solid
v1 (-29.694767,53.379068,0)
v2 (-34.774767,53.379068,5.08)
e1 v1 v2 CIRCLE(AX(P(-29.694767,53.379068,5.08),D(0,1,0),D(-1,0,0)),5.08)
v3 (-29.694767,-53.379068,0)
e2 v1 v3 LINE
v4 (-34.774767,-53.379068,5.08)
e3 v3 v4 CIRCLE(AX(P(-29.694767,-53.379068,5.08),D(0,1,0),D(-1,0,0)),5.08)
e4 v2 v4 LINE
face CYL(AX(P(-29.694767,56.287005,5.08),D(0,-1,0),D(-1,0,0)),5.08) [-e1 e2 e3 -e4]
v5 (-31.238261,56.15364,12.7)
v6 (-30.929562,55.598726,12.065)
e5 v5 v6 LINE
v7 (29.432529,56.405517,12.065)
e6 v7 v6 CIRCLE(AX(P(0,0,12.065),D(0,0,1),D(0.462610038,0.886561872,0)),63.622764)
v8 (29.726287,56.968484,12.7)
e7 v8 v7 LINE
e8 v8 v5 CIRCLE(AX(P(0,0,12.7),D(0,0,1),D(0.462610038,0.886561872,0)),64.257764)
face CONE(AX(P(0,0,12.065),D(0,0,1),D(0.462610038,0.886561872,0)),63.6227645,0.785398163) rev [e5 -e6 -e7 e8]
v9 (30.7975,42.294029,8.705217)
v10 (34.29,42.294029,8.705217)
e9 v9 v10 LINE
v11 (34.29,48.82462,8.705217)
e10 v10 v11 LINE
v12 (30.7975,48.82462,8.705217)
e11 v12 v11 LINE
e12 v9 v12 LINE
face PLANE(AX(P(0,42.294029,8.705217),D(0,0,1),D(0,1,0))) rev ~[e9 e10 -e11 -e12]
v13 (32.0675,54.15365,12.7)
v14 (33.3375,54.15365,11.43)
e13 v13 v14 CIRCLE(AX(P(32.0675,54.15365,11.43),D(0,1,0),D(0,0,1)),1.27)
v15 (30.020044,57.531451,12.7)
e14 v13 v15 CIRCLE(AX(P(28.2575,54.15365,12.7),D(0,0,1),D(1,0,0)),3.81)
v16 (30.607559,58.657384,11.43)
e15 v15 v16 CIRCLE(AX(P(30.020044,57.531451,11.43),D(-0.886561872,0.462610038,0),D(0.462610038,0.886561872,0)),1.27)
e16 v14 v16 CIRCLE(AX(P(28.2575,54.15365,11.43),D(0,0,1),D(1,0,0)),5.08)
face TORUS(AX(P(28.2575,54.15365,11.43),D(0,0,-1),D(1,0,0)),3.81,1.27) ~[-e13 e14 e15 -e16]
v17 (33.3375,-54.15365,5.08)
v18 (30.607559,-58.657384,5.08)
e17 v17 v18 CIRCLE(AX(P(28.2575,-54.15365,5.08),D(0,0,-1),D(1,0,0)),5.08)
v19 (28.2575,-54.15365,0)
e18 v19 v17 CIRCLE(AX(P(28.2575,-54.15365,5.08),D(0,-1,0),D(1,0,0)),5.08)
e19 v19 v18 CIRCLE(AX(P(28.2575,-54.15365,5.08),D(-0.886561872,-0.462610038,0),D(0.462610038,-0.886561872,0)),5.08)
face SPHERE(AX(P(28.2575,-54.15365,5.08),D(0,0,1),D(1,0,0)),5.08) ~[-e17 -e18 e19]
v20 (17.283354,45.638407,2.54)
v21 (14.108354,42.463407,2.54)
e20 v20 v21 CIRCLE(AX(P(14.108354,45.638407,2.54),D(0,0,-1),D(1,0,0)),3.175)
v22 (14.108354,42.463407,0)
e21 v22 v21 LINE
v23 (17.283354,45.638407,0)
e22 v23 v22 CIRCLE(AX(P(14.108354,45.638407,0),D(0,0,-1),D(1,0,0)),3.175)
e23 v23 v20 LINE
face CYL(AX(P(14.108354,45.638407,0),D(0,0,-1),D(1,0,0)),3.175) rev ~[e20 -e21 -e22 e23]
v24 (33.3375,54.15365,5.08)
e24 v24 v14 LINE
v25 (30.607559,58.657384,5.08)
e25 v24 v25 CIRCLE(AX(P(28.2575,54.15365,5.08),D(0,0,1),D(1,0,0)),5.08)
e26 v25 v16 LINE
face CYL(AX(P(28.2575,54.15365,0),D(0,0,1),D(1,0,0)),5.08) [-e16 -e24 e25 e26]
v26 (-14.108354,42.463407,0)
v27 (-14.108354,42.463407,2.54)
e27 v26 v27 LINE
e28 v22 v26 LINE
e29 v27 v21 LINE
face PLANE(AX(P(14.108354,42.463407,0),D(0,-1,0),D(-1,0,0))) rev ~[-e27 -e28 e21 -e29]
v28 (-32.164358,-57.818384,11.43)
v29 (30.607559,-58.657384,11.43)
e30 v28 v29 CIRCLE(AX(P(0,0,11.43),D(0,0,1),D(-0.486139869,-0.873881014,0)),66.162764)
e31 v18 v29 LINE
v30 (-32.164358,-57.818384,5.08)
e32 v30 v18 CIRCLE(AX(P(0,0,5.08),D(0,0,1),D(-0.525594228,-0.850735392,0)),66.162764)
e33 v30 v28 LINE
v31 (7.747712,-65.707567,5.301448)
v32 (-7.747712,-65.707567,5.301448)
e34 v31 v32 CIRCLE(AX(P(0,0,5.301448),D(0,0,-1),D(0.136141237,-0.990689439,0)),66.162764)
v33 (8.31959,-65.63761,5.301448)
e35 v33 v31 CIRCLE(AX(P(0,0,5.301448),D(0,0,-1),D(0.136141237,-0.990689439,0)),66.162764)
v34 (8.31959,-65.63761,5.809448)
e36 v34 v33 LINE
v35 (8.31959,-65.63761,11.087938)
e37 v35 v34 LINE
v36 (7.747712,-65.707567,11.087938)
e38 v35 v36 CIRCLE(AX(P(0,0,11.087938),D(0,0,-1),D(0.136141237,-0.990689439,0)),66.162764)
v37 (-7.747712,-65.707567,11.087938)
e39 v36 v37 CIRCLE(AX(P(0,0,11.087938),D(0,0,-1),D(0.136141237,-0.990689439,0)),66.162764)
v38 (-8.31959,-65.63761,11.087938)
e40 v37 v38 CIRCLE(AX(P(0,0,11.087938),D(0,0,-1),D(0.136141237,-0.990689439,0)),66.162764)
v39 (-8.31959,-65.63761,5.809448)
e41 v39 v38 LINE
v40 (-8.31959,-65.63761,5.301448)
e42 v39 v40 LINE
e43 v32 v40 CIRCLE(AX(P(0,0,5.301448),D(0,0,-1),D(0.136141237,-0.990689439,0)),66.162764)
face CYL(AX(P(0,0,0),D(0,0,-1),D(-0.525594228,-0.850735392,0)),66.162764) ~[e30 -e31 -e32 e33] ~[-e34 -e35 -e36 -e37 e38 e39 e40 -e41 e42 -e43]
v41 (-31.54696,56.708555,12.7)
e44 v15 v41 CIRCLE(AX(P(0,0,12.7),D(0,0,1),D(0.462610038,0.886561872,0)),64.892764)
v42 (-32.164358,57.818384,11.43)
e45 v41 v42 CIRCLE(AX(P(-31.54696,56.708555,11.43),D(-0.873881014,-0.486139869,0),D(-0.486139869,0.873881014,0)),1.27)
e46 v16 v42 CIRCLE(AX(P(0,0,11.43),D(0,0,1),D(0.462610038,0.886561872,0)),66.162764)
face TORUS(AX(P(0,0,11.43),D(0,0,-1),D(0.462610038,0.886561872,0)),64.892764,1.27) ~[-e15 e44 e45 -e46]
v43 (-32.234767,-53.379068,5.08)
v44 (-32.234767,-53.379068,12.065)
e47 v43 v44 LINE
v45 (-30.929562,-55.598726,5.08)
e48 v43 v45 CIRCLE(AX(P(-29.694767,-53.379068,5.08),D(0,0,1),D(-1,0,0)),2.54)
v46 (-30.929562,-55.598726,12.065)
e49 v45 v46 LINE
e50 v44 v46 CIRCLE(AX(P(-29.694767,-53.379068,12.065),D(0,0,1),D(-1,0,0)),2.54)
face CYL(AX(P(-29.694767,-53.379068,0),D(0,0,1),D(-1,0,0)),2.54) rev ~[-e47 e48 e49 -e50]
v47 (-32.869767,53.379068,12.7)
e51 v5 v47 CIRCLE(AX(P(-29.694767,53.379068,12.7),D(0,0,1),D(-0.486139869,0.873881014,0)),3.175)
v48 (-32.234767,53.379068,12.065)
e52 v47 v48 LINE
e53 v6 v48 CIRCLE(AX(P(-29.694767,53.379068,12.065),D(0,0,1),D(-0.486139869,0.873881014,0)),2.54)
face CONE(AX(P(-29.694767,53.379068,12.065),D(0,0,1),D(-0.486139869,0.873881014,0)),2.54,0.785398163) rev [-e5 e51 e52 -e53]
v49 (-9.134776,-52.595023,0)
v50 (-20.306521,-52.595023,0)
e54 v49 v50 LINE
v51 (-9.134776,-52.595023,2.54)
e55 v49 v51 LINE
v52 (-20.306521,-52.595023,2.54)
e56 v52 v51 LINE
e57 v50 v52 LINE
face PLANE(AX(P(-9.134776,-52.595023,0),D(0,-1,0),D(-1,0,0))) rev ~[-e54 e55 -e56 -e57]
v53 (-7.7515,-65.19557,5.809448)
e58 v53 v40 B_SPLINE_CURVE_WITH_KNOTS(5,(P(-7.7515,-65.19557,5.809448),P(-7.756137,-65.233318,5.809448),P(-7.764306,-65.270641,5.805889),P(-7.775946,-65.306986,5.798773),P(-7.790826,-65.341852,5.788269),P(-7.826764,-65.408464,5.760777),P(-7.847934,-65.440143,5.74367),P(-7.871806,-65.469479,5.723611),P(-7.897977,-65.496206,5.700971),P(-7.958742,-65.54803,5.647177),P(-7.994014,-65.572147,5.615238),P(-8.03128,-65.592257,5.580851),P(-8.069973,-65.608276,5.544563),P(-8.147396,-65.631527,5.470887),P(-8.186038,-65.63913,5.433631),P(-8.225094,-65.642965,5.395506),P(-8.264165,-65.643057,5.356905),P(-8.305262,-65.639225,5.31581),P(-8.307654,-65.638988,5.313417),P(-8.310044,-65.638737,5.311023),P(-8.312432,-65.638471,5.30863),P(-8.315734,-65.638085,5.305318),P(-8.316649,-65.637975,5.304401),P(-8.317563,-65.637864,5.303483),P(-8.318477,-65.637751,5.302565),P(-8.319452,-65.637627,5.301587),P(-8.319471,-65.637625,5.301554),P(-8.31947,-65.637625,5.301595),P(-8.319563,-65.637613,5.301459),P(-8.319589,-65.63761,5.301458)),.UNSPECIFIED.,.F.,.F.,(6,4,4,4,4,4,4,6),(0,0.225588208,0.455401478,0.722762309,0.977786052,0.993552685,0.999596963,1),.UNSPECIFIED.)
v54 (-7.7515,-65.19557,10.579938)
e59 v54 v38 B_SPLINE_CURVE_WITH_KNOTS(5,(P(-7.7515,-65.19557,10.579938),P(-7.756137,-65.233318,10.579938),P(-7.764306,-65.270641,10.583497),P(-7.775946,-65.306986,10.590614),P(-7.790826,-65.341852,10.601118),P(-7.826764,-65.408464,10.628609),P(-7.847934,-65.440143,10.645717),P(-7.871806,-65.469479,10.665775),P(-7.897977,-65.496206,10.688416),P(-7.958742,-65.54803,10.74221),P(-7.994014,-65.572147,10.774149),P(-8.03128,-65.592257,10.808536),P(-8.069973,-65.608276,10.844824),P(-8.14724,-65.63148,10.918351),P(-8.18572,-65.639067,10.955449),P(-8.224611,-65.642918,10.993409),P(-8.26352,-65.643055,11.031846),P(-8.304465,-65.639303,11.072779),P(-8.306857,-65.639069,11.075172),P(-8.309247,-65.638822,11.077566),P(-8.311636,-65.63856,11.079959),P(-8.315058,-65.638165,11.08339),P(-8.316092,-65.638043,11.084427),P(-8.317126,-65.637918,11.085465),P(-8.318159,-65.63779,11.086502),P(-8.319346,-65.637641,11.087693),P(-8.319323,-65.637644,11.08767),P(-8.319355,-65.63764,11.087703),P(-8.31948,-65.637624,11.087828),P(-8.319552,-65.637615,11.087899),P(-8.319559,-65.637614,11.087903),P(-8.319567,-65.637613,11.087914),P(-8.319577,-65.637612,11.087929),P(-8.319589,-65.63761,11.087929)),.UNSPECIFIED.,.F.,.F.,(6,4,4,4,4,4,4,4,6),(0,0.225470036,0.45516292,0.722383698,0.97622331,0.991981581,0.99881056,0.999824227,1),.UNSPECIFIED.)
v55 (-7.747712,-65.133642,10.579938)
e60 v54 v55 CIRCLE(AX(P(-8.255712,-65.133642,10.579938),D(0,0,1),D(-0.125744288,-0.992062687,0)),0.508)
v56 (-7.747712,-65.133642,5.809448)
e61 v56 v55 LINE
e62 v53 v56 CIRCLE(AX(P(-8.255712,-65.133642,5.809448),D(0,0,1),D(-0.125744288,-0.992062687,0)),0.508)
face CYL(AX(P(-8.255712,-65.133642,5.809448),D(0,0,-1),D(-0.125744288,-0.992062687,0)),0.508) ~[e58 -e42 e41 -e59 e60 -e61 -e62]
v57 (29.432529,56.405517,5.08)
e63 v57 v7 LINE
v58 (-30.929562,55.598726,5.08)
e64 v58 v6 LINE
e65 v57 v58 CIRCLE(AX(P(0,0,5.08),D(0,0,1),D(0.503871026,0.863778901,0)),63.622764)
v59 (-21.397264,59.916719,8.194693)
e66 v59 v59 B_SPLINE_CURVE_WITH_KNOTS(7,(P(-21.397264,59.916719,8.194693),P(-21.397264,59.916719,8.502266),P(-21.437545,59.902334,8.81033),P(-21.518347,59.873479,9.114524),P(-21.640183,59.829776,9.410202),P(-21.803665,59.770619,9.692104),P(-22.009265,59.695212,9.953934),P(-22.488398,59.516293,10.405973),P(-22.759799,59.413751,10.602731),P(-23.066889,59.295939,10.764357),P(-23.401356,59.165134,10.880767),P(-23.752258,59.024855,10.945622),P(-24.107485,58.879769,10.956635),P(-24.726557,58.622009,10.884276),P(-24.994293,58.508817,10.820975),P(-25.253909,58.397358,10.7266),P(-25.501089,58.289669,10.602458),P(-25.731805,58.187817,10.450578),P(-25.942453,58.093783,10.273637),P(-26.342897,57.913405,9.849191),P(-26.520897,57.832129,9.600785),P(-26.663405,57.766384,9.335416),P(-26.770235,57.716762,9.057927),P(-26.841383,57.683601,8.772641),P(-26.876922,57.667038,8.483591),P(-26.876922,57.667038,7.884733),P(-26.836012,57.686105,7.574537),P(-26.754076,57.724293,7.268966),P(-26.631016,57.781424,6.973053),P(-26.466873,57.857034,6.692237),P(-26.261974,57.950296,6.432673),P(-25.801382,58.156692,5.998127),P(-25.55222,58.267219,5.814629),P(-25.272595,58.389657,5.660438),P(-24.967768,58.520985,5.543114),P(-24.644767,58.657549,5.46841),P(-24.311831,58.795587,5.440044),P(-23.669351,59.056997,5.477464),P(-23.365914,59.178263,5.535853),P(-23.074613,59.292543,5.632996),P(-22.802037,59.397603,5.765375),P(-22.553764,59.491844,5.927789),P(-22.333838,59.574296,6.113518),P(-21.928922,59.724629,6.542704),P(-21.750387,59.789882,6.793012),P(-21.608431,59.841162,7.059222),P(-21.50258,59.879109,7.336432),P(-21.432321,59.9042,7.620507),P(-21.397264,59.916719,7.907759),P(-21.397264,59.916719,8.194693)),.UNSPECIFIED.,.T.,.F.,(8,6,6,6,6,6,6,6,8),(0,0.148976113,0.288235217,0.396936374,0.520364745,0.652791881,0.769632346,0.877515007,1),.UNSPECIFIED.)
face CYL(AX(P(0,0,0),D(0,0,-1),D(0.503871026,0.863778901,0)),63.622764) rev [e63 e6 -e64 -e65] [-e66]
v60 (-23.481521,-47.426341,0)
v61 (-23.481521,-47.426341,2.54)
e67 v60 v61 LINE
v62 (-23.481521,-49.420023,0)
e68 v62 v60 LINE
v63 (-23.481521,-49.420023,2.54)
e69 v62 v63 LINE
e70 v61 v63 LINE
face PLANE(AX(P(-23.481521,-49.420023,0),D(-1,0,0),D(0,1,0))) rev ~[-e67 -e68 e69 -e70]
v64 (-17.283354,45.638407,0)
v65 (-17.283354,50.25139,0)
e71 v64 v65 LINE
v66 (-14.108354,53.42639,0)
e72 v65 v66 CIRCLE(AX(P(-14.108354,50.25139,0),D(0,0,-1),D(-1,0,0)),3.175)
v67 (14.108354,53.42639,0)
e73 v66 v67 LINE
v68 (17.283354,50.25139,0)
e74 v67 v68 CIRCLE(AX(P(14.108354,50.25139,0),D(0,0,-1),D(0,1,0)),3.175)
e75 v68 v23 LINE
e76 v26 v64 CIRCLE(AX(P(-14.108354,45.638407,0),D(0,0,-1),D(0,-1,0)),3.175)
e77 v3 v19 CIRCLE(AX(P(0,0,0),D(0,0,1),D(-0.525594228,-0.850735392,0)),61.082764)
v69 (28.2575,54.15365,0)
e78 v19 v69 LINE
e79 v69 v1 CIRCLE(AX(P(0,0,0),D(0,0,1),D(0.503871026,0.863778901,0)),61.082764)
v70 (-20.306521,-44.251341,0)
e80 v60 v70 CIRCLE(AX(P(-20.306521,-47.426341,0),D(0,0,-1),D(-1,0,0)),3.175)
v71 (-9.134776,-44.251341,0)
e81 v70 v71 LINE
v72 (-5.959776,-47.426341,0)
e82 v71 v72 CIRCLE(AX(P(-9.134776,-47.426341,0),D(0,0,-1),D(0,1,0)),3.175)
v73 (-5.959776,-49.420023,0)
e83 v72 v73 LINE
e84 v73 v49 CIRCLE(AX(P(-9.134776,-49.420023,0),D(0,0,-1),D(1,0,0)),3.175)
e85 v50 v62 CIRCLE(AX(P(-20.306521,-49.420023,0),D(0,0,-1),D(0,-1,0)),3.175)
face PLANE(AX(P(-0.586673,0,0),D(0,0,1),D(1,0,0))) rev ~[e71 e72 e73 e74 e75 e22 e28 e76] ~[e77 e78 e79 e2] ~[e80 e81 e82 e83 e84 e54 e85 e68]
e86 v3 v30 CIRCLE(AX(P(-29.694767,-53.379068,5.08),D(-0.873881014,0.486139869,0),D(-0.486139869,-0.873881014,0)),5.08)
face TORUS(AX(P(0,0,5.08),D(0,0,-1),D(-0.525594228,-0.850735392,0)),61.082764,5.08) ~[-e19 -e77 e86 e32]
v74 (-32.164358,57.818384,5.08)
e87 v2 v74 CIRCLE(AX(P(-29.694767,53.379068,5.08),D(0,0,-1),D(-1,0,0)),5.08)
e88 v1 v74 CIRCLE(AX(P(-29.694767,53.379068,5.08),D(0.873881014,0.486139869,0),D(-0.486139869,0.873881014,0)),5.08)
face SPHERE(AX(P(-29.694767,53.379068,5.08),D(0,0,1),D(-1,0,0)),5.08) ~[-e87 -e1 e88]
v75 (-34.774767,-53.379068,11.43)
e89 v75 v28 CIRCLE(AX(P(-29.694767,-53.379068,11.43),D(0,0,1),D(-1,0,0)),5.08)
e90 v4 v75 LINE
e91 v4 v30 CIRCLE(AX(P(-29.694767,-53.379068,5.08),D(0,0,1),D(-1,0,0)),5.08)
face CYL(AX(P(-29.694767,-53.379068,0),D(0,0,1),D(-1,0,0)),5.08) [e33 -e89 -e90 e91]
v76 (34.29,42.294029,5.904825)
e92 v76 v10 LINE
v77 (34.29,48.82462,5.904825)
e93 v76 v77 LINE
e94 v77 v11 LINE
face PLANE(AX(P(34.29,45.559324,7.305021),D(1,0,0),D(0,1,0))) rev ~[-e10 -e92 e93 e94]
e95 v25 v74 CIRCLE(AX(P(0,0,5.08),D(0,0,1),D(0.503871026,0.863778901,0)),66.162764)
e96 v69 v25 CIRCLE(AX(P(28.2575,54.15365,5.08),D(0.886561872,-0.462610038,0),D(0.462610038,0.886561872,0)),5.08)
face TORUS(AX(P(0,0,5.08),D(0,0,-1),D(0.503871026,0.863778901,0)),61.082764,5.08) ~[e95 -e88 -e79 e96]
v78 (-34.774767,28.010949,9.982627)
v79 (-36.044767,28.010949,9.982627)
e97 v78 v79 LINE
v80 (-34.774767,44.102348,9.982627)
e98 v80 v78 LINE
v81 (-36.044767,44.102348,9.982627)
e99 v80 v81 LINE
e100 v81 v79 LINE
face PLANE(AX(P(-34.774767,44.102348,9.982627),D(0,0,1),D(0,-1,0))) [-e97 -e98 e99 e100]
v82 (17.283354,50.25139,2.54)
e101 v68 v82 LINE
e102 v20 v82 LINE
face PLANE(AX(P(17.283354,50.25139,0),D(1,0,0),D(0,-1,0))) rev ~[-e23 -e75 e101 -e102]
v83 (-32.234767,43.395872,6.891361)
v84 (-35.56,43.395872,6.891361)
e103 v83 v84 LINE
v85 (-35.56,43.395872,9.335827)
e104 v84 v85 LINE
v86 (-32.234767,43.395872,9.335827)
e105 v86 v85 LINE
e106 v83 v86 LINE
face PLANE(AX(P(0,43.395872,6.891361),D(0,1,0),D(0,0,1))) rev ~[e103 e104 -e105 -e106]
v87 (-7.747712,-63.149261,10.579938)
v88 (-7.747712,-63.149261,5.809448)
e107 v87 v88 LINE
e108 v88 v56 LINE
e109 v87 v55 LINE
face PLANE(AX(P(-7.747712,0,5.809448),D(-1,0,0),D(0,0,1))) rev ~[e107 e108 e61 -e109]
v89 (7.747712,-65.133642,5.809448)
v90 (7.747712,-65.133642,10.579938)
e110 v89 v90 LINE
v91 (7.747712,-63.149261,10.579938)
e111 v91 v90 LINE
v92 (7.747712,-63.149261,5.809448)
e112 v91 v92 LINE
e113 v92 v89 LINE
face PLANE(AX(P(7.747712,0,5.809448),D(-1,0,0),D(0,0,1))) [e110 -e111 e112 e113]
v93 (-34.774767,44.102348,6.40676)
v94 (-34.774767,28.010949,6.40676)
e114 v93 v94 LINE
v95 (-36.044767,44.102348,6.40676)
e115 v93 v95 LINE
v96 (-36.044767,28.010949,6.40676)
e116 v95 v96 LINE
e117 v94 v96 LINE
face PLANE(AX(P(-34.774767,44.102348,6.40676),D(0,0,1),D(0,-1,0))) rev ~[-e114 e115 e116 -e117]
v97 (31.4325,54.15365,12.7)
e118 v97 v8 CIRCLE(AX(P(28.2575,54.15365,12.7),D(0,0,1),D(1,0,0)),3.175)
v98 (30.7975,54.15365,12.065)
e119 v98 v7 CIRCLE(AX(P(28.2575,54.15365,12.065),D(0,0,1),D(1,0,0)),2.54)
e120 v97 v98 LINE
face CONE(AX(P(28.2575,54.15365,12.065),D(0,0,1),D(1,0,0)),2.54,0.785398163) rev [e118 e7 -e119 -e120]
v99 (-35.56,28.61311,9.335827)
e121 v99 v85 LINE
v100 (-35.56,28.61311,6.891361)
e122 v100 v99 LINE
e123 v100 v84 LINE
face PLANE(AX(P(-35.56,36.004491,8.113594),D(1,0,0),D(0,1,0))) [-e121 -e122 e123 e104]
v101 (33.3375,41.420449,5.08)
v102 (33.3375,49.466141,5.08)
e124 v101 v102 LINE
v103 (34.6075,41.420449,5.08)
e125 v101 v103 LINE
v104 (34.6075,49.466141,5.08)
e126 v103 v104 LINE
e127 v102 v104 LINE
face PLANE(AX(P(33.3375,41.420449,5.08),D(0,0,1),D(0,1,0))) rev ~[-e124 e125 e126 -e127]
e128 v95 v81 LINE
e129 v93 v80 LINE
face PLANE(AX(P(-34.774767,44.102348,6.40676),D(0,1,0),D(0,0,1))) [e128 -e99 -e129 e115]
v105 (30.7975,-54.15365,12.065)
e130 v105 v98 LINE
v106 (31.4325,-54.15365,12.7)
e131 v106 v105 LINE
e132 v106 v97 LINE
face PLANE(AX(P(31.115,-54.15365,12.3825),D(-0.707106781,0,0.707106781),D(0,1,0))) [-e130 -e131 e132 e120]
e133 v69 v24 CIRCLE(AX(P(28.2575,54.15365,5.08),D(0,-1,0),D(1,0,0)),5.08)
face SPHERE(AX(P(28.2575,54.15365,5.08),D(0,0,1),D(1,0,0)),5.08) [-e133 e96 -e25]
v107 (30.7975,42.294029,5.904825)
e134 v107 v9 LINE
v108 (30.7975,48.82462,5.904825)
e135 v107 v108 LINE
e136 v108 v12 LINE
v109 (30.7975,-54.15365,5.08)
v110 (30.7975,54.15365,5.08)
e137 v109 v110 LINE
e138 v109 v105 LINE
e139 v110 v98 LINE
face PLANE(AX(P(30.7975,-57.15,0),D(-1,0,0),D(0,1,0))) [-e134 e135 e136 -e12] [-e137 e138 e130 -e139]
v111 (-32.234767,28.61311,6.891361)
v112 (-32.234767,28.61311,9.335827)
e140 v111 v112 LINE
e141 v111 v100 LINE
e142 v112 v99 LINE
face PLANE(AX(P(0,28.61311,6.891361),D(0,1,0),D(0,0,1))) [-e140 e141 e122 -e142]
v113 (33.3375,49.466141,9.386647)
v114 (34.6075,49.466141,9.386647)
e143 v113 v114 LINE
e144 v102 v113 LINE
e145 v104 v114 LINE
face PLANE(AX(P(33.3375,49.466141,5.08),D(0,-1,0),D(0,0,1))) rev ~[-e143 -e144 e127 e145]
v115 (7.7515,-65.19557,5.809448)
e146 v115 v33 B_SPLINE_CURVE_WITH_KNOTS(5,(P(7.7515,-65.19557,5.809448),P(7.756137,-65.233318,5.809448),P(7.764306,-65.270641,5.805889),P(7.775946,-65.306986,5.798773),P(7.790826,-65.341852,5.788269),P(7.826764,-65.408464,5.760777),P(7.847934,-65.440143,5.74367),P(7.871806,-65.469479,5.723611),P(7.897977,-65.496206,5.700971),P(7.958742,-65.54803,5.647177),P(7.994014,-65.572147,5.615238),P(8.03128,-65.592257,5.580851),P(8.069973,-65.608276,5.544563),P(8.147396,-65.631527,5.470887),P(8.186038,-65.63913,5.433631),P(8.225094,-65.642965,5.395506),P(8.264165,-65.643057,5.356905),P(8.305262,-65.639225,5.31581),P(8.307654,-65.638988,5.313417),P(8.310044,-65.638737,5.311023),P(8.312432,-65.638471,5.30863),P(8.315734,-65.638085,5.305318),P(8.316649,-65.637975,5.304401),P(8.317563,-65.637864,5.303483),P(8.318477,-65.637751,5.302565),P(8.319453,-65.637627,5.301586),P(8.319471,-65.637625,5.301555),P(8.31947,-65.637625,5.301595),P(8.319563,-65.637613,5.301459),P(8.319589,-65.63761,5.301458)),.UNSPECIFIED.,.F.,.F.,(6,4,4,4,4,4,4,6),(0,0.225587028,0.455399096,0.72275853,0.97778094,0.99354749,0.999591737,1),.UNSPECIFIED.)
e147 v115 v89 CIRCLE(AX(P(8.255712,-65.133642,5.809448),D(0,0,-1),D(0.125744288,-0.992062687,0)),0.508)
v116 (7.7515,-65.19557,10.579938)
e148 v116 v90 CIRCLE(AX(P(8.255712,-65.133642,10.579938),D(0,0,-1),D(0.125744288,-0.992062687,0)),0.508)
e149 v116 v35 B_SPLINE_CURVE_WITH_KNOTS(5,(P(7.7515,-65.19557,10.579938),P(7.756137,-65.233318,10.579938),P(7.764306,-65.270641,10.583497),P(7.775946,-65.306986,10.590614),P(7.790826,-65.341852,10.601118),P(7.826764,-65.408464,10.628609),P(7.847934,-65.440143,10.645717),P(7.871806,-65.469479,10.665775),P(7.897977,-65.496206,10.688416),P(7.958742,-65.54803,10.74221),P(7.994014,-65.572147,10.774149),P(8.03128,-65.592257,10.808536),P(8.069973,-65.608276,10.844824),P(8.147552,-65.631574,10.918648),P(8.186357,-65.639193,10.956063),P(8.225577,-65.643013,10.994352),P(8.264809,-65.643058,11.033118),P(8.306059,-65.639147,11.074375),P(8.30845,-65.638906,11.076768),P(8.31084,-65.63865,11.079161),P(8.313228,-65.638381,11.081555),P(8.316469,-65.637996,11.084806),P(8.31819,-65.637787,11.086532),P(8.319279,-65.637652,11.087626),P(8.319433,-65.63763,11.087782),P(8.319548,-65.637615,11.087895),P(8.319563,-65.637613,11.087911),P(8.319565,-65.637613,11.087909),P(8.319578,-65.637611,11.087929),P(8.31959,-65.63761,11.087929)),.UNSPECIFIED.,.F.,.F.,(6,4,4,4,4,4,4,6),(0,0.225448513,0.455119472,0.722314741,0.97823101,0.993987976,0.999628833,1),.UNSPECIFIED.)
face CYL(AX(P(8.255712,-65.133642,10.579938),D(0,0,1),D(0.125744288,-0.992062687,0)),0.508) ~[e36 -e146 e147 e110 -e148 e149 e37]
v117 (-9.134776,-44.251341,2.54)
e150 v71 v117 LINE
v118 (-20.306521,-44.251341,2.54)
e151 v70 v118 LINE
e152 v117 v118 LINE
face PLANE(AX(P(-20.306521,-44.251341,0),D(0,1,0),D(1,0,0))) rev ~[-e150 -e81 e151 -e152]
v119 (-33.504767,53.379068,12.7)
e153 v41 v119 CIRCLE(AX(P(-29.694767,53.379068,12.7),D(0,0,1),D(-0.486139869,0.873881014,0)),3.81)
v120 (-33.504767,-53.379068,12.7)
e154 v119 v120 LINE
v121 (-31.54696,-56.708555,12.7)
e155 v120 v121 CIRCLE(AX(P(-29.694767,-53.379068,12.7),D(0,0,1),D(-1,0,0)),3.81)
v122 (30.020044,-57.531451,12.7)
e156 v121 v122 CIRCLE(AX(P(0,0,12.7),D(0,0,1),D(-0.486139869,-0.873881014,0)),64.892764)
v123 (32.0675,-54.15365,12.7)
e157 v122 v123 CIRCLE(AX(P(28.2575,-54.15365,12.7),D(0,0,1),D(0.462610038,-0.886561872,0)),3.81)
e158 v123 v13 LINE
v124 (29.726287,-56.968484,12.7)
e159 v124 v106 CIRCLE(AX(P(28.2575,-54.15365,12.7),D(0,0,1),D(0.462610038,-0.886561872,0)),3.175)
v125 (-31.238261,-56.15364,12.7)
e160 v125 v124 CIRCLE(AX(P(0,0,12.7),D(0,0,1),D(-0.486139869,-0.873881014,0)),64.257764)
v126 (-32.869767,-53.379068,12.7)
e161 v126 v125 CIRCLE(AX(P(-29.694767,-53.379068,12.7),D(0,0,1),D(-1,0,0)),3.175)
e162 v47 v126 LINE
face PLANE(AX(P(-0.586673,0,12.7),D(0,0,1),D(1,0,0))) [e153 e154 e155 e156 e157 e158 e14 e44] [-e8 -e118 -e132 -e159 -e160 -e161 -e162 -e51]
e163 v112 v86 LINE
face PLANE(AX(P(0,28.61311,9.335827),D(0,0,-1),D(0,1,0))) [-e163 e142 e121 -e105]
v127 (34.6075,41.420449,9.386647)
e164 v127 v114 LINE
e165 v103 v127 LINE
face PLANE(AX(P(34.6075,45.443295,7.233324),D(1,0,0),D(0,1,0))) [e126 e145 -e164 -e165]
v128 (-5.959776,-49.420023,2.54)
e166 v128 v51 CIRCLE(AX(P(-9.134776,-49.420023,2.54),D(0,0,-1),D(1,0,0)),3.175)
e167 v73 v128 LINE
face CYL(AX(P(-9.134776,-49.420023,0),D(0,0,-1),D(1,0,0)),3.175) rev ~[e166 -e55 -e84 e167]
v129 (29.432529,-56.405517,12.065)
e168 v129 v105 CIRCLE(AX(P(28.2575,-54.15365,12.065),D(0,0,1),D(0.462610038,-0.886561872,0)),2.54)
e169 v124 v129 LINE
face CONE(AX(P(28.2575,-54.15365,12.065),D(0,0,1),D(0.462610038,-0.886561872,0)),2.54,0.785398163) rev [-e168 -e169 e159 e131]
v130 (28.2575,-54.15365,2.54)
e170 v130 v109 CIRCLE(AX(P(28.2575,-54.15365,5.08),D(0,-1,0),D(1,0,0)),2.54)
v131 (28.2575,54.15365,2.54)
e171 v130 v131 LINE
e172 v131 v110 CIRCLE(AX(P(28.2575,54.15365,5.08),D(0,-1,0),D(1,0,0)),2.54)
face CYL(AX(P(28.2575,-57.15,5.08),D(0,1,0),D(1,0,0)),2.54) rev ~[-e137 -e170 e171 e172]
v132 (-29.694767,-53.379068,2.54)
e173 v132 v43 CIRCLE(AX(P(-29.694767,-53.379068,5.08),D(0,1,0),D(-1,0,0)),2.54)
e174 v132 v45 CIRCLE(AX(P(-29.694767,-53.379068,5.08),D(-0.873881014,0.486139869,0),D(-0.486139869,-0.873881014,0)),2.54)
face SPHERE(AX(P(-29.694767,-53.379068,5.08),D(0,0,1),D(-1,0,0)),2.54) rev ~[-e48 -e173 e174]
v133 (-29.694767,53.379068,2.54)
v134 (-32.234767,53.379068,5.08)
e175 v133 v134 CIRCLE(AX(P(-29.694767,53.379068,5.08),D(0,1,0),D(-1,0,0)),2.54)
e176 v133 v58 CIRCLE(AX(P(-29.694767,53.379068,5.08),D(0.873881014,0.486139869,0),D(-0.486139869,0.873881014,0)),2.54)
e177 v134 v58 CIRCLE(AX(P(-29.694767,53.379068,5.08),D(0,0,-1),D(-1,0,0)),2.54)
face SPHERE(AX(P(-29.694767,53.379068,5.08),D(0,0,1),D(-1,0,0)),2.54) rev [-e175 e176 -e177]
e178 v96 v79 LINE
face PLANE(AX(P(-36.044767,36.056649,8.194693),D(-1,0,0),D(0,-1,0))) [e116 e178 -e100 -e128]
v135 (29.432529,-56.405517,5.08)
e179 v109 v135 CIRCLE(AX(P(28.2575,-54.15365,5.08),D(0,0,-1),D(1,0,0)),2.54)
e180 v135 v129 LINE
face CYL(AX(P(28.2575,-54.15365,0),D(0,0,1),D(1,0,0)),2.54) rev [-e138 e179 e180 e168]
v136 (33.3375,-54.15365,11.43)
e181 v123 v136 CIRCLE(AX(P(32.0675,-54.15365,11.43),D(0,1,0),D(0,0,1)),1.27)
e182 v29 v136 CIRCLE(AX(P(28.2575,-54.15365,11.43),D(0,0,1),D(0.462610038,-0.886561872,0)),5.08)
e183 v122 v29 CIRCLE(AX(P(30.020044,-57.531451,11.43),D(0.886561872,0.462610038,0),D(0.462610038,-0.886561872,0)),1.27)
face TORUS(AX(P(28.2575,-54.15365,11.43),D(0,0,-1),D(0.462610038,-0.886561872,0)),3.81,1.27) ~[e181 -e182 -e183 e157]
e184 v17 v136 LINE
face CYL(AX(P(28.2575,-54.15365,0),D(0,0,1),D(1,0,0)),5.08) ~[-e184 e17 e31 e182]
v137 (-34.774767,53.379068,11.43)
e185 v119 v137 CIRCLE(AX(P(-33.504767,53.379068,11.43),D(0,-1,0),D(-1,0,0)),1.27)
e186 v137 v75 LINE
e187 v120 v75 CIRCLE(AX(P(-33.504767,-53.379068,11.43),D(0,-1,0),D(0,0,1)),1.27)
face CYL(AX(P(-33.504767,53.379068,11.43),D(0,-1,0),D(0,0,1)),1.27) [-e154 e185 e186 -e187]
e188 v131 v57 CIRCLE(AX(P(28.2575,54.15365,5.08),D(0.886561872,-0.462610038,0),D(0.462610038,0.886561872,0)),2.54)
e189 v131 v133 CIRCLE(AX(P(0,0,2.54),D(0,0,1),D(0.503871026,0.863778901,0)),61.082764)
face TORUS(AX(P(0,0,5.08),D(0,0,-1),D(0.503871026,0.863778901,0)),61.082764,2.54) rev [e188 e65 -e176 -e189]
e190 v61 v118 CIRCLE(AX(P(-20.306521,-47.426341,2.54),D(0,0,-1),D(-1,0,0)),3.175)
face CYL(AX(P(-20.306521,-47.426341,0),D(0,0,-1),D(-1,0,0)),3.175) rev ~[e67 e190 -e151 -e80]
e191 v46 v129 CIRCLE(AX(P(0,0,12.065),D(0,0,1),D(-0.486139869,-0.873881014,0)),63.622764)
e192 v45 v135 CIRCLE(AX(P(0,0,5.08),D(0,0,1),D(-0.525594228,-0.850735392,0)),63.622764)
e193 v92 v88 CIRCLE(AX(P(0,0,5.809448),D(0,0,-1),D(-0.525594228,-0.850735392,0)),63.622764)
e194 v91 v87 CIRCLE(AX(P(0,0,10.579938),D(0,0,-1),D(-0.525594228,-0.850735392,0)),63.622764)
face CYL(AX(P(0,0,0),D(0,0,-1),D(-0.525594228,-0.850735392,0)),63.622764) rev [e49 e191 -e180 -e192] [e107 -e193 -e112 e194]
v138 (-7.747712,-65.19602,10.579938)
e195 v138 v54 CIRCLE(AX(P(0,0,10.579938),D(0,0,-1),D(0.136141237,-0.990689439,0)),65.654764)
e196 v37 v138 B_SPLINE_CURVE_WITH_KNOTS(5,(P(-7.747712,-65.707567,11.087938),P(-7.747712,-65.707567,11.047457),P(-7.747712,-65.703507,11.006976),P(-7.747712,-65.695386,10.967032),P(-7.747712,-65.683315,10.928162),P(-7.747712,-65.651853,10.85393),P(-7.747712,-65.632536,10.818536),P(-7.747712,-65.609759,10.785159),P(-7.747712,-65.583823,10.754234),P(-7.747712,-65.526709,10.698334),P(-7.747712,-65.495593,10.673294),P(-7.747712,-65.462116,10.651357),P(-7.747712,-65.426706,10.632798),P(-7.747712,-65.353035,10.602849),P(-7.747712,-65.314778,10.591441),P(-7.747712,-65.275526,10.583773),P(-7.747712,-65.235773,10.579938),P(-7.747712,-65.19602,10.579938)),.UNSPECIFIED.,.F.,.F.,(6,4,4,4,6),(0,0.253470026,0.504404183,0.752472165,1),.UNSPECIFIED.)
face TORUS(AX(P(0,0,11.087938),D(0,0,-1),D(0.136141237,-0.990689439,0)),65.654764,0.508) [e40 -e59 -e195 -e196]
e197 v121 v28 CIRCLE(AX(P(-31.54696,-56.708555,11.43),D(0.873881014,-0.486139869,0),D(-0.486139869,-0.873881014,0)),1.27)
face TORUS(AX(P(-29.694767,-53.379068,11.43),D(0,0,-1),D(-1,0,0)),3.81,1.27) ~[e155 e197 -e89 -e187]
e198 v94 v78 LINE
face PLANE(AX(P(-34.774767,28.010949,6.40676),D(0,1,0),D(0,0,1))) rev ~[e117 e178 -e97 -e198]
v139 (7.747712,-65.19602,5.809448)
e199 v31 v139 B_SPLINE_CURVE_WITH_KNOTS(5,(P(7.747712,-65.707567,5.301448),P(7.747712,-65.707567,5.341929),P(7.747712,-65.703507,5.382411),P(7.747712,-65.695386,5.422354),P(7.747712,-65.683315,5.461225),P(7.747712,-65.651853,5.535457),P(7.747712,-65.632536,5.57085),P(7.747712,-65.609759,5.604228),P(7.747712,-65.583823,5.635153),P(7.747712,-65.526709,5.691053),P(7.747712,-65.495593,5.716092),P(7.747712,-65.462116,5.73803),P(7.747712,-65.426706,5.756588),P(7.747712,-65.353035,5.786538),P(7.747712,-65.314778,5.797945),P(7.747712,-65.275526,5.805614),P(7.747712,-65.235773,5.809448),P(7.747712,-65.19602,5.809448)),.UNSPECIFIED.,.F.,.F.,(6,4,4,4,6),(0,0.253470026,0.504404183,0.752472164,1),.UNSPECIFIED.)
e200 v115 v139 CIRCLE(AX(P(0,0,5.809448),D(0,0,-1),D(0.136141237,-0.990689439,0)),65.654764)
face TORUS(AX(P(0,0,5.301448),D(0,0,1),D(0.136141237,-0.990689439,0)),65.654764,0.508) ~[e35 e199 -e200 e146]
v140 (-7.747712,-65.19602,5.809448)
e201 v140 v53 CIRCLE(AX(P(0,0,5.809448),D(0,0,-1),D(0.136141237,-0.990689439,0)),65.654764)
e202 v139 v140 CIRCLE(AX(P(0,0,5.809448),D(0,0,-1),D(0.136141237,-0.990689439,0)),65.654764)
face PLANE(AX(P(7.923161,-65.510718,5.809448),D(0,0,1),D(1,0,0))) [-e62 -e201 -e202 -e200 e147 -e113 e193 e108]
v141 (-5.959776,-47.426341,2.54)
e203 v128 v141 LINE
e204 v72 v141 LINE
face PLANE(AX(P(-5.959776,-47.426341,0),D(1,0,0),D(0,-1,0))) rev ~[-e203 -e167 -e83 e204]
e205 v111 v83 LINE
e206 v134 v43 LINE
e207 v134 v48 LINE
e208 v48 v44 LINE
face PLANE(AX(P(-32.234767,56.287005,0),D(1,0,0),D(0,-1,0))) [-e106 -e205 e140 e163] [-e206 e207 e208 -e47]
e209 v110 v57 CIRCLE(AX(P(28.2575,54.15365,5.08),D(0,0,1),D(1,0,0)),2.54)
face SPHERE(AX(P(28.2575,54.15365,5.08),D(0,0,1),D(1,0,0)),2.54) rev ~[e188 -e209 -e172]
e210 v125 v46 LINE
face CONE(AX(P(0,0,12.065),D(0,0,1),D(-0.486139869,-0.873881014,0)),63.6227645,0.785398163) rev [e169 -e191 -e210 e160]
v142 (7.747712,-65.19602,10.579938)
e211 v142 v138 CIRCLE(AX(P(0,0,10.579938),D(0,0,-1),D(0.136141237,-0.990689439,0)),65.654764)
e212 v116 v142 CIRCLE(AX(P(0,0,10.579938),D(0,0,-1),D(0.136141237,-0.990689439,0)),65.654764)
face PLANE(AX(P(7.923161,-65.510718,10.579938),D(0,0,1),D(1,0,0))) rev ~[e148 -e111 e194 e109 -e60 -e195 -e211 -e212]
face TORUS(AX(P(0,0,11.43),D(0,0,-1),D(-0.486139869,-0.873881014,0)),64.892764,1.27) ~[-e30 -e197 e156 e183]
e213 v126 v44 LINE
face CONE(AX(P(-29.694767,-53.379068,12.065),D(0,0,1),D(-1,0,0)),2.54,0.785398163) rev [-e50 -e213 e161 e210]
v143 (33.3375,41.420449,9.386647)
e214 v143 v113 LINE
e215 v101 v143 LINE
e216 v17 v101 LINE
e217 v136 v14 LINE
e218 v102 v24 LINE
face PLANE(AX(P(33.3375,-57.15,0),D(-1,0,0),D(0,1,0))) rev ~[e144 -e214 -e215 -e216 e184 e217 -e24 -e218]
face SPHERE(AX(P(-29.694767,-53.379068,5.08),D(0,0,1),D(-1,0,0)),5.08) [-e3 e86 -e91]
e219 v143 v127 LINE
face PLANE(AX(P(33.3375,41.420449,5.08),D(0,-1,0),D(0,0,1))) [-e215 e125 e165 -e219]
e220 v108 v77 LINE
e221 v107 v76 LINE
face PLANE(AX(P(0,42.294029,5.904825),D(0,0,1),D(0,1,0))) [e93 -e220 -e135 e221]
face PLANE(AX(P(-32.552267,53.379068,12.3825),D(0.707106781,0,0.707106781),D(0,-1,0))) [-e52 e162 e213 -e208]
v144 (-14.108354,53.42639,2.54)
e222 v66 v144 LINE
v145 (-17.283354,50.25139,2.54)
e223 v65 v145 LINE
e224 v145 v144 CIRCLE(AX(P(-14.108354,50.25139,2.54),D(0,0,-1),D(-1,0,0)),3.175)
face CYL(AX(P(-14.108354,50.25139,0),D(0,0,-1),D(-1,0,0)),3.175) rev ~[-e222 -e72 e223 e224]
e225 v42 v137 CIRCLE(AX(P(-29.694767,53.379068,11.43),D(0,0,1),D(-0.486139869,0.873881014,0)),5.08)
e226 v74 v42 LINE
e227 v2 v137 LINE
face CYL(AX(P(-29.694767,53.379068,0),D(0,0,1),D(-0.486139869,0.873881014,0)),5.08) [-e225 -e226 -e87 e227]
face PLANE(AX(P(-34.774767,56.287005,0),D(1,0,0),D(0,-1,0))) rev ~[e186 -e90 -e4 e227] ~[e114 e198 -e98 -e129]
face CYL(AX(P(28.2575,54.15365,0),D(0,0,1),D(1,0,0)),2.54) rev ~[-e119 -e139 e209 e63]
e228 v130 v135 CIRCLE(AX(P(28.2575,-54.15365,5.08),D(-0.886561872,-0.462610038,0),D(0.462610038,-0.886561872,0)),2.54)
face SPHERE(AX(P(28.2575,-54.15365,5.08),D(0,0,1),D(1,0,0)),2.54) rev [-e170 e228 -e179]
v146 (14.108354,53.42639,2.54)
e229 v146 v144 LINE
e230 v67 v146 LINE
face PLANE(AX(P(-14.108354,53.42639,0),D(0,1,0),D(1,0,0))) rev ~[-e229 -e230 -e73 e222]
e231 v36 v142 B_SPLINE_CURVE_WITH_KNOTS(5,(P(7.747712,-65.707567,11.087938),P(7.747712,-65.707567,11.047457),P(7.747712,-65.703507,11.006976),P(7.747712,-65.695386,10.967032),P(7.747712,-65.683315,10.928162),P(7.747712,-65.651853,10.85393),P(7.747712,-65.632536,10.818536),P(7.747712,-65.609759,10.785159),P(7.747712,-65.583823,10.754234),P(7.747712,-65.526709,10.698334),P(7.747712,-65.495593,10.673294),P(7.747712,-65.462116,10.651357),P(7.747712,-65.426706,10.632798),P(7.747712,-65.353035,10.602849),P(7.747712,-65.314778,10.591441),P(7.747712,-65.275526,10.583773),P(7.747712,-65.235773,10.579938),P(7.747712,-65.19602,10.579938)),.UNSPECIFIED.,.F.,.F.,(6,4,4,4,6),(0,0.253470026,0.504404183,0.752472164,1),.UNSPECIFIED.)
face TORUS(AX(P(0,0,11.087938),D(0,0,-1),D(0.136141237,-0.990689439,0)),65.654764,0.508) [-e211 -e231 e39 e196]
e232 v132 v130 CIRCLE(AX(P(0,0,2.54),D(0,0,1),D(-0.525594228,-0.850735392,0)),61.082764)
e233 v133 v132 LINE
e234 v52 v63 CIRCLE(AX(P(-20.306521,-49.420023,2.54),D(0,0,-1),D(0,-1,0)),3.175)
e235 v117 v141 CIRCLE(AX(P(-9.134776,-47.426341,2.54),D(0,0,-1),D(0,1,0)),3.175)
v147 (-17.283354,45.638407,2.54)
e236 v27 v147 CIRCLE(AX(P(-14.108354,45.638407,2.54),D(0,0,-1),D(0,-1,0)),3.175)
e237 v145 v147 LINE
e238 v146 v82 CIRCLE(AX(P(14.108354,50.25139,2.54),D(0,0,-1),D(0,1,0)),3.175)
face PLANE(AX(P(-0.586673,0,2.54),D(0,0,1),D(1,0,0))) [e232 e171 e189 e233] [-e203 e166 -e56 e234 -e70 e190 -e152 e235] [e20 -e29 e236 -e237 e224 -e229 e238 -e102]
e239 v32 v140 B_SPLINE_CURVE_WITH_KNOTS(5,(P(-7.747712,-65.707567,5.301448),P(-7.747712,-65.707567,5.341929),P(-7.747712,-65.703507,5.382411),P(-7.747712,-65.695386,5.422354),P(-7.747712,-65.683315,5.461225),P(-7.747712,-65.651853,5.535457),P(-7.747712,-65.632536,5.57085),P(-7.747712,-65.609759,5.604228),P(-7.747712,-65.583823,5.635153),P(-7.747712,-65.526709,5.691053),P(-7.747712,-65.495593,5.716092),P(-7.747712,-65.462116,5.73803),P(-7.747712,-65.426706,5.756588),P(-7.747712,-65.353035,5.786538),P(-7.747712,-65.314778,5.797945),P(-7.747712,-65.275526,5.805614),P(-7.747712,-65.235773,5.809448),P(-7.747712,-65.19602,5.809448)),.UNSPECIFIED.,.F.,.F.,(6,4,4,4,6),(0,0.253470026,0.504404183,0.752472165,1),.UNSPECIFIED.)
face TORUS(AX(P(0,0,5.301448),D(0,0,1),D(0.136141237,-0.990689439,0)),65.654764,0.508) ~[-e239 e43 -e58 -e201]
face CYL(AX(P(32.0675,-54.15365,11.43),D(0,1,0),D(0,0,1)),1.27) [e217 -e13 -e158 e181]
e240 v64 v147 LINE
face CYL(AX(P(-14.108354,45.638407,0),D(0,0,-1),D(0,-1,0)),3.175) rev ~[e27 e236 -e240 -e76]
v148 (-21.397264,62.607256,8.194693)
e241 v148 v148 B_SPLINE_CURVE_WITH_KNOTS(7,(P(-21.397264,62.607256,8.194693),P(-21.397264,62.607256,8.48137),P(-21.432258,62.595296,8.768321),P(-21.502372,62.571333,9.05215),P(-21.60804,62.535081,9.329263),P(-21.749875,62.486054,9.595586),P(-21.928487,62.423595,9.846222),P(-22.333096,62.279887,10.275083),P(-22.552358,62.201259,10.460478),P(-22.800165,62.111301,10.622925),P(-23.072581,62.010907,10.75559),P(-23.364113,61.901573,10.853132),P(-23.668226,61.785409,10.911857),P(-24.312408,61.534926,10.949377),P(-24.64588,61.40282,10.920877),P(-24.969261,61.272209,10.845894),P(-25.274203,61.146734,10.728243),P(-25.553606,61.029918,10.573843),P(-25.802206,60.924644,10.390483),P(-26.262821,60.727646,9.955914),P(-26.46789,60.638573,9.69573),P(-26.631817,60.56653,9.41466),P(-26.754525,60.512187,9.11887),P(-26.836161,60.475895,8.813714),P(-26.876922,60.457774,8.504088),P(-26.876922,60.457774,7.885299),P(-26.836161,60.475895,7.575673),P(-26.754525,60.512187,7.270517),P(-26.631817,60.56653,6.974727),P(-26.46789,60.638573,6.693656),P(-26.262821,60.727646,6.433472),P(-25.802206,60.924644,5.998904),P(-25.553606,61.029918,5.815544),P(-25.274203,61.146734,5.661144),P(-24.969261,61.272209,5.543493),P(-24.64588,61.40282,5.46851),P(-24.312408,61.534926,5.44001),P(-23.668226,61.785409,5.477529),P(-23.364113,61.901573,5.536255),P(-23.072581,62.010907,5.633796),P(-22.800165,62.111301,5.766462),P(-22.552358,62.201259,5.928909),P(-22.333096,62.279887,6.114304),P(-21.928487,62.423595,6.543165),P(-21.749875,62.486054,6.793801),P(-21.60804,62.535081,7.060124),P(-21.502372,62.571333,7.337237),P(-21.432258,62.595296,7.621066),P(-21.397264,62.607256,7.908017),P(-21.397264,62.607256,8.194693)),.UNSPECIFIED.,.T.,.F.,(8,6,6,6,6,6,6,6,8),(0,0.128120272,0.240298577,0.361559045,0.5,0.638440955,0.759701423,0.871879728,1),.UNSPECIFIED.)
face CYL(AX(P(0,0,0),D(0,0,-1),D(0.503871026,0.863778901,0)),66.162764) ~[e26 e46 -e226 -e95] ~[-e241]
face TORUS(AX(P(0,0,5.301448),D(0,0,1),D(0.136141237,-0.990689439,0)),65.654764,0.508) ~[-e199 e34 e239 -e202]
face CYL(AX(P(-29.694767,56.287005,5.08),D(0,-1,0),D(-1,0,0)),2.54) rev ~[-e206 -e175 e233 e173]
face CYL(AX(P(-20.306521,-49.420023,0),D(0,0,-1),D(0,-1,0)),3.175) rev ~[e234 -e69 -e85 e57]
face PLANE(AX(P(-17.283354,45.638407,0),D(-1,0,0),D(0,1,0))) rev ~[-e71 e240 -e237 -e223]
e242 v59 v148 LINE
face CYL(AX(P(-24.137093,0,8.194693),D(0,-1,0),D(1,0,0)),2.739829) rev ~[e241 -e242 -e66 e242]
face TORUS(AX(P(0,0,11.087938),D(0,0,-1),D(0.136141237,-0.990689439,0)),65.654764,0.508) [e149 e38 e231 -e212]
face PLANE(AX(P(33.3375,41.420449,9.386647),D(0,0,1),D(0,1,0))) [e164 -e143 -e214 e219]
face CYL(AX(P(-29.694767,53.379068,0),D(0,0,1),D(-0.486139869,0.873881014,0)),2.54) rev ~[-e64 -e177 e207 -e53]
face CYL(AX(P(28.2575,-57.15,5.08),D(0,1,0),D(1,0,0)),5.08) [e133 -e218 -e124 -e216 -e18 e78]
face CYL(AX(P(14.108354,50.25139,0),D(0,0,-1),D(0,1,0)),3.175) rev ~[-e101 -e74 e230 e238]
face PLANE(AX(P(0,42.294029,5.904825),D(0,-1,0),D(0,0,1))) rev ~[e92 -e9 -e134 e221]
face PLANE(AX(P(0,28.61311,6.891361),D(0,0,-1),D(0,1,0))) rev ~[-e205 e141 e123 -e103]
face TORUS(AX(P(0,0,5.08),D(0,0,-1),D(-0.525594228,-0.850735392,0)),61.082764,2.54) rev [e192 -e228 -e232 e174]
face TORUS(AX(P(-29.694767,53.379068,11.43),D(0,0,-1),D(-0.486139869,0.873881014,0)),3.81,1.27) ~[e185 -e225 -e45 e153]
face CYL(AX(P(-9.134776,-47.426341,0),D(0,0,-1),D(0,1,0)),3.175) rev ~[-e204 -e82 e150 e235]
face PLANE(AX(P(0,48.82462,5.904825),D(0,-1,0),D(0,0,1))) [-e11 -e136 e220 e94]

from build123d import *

# Parameters (mm, degrees)
F1_DEPTH     = 12.7
F2_R         = 5.08
F3_T         = -2.54
F4_SIZE      = 0.635
F5_R         = 1.27
F6_W         = 15.4954232275
F6_H         = 4.7704899881
F7_DEPTH     = 66.1637644998
F8_T1_DEPTH  = 4.7704899881
F8_T6_ANGLE  = 15.6492345412
F8_T12_ANGLE = 15.6492345412
F8_T19_ANGLE = 15.6492345412
F8_T23_DEPTH = 6.2108427353
F8_T30_ANGLE = 15.6492345412
F8_T34_DEPTH = 6.2108427353
F8_T41_ANGLE = 15.6492345412
F8_T45_DEPTH = 6.2108427353
F8_T52_DEPTH = 6.2108427353
F8_T56_ANGLE = 15.6492345412
F9_W         = 8.0456919968
F9_H         = 4.306647027
F10_DEPTH    = 1.27
F11_R        = 2.7398291671
F12_DEPTH    = 66.1637645998
F13_W        = 16.0913988948
F13_H        = 3.5758665763
F14_DEPTH    = 1.27
F16_DEPTH    = 12.701
F18_DEPTH    = 12.701
F19_W        = 14.7827621549
F19_H        = 2.4444661103
F20_DEPTH    = 35.56
F21_W        = 6.5305903554
F21_H        = 2.8003924526
F22_DEPTH    = 34.29


# Not quite as in the source:
# - a fillet or chamfer that OpenCascade refuses, or shapes differently, is made with other operations: its cross-section is extruded or revolved along the edge and cut away or added


with BuildPart() as f1:
    # F0 (on Top) → F1 (new body)
    with BuildSketch(Plane.XY):
        with BuildLine():
            Line((33.3375, -57.15), (33.3375, 57.15))
            ThreePointArc((33.3375, 57.15), (-0.8382267858, 66.1574544712), (-34.7747671557, 56.2870053877))
            Line((-34.7747671557, 56.2870053877), (-34.7747671557, -56.2870053877))
            ThreePointArc((-34.7747671557, -56.2870053877), (-0.8382267858, -66.1574544712), (33.3375, -57.15))
        make_face()
    extrude(amount=F1_DEPTH)

    # F2
    f2_edges = [f1.edges().sort_by_distance(p)[0] for p in [
        (33.3375, -57.15, 6.35),
        (33.3375, 0, 0),
        (-34.774767, 0, 0),
        (-0.838227, 66.157454, 0),
        (-34.774767, 56.287005, 6.35),
        (33.3375, 57.15, 6.35),
        (-0.838227, -66.157454, 0),
        (-34.774767, -56.287005, 6.35),
    ]]
    fillet(f2_edges, radius=F2_R)

    # F3
    f3_openings = [f1.faces().sort_by_distance(p)[0] for p in [
        (-0.646739, 0, 12.7),
    ]]
    offset(amount=F3_T, openings=f3_openings)

    # F4
    f4_edges = [f1.edges().sort_by_distance(p)[0] for p in [
        (-0.850297, 63.617082, 12.7),
        (30.7975, 0, 12.7),
        (-0.850297, -63.617082, 12.7),
        (-32.234767, 0, 12.7),
        (-31.884285, 54.66655, 12.7),
        (30.429616, 55.470279, 12.7),
        (30.429616, -55.470279, 12.7),
        (-31.884285, -54.66655, 12.7),
    ]]
    chamfer(f4_edges, length=F4_SIZE)

    # F5
    f5_edges = [f1.edges().sort_by_distance(p)[0] for p in [
        (33.3375, 0, 12.7),
        (32.601732, -56.786909, 12.7),
        (-0.884243, -66.156855, 12.7),
        (-34.073804, -55.954032, 12.7),
        (-34.774767, 0, 12.7),
        (-34.073804, 55.954032, 12.7),
        (-0.884243, 66.156855, 12.7),
        (32.601732, 56.786909, 12.7),
    ]]
    fillet(f5_edges, radius=F5_R)

    # F6 (on Front) → F7 (cut, through all)
    with BuildSketch(Plane.XZ):
        with Locations((0, 8.1946933642)):
            Rectangle(F6_W, F6_H)
    extrude(amount=F7_DEPTH, mode=Mode.SUBTRACT)

    # F8: fillet of radius 0.508 on 4 edges, made by hand

    # F8_s2 → F8_t1 (cut)
    with BuildSketch(Plane.XY.offset(5.8094483702)):
        with BuildLine():
            ThreePointArc((-8.3195897121, -65.6376098991), (-7.9198441354, -65.5147680663), (-7.7477116138, -65.1336420544))
            Line((-7.7477116138, -65.1336420544), (-7.7477116138, -65.7075670756))
            ThreePointArc((-7.7477116138, -65.7075670756), (-8.0337268111, -65.6732109751), (-8.3195897121, -65.6376098991))
        make_face()
        with BuildLine():
            ThreePointArc((8.3195897121, -65.6376098991), (7.9198441354, -65.5147680663), (7.7477116138, -65.1336420544))
            Line((7.7477116138, -65.1336420544), (7.7477116138, -65.7075670756))
            ThreePointArc((7.7477116138, -65.7075670756), (8.0337268111, -65.6732109751), (8.3195897121, -65.6376098991))
        make_face()
    extrude(amount=F8_T1_DEPTH, mode=Mode.SUBTRACT)


with BuildPart() as f8_tool4:
    # F8_s5 → F8_t6 (revolve)
    with BuildSketch(Plane(origin=(0, 0, 0), x_dir=(0, 0, 1), z_dir=(0.9906894385, 0.1361412371, 0))):
        with BuildLine():
            ThreePointArc((5.3014483702, 66.1627644998), (5.660658615, 66.0139747446), (5.8094483702, 65.6547644998))
            Line((5.8094483702, 65.6547644998), (5.8094483702, 66.1627644998))
            Line((5.8094483702, 66.1627644998), (5.3014483702, 66.1627644998))
        make_face()
    revolve(axis=Axis((0, 0, 5.8094483702), (0, 0, -1)), revolution_arc=F8_T6_ANGLE)

    split(bisect_by=Plane.YZ.offset(7.7477116138), keep=Keep.BOTTOM)

    split(bisect_by=Plane.YZ.offset(-7.7477116138), keep=Keep.TOP)


with BuildPart() as f1_1:
    add(f1.part)

    # F8_t3: cut F8_tool4
    add(f8_tool4.part, mode=Mode.SUBTRACT)


with BuildPart() as f8_tool10:
    # F8_s11 → F8_t12 (revolve)
    with BuildSketch(Plane(origin=(0, 0, 0), x_dir=(0, 0, 1), z_dir=(0.9906894385, 0.1361412371, 0))):
        with BuildLine():
            ThreePointArc((11.0879383582, 66.1627644998), (10.7287281134, 66.0139747446), (10.5799383582, 65.6547644998))
            Line((10.5799383582, 65.6547644998), (10.5799383582, 66.1627644998))
            Line((10.5799383582, 66.1627644998), (11.0879383582, 66.1627644998))
        make_face()
    revolve(axis=Axis((0, 0, 10.5799383582), (0, 0, -1)), revolution_arc=F8_T12_ANGLE)

    split(bisect_by=Plane.YZ.offset(-7.7477116138), keep=Keep.TOP)

    split(bisect_by=Plane.YZ.offset(7.7477116138), keep=Keep.BOTTOM)


with BuildPart() as f1_2:
    add(f1_1.part)

    # F8_t9: cut F8_tool10
    add(f8_tool10.part, mode=Mode.SUBTRACT)


with BuildPart() as f8_tool17:
    # F8_s18 → F8_t19 (revolve)
    with BuildSketch(Plane(origin=(0, 0, 0), x_dir=(0, 0, 1), z_dir=(0.9906894385, 0.1361412371, 0))):
        with BuildLine():
            ThreePointArc((11.0879383582, 66.1627644998), (10.7287281134, 66.0139747446), (10.5799383582, 65.6547644998))
            Line((10.5799383582, 65.6547644998), (10.5799383582, 66.1627644998))
            Line((10.5799383582, 66.1627644998), (11.0879383582, 66.1627644998))
        make_face()
    revolve(axis=Axis((0, 0, 10.5799383582), (0, 0, -1)), revolution_arc=F8_T19_ANGLE)

    split(bisect_by=Plane.YZ.offset(-7.7477116138), keep=Keep.BOTTOM)


with BuildPart() as f8_tool21:
    # F8_s22 → F8_t23 (new body)
    with BuildSketch(Plane.XY.offset(12.0202911055)):
        with BuildLine():
            ThreePointArc((-8.3195897121, -65.6376098991), (-7.9198441354, -65.5147680663), (-7.7477116138, -65.1336420544))
            Line((-7.7477116138, -65.1336420544), (-7.7477116138, -65.7075670756))
            ThreePointArc((-7.7477116138, -65.7075670756), (-8.0337268111, -65.6732109751), (-8.3195897121, -65.6376098991))
        make_face()
    extrude(amount=-F8_T23_DEPTH)

    split(bisect_by=Plane.XY.offset(10.5799383582), keep=Keep.TOP)


with BuildPart() as f8_tool17_1:
    add(f8_tool17.part)

    # F8_t25: intersect F8_tool21
    add(f8_tool21.part, mode=Mode.INTERSECT)


with BuildPart() as f1_3:
    add(f1_2.part)

    # F8_t15: cut F8_tool17
    add(f8_tool17_1.part, mode=Mode.SUBTRACT)


with BuildPart() as f8_tool28:
    # F8_s29 → F8_t30 (revolve)
    with BuildSketch(Plane(origin=(0, 0, 0), x_dir=(0, 0, 1), z_dir=(0.9906894385, 0.1361412371, 0))):
        with BuildLine():
            ThreePointArc((5.3014483702, 66.1627644998), (5.660658615, 66.0139747446), (5.8094483702, 65.6547644998))
            Line((5.8094483702, 65.6547644998), (5.8094483702, 66.1627644998))
            Line((5.8094483702, 66.1627644998), (5.3014483702, 66.1627644998))
        make_face()
    revolve(axis=Axis((0, 0, 5.8094483702), (0, 0, -1)), revolution_arc=F8_T30_ANGLE)

    split(bisect_by=Plane.YZ.offset(-7.7477116138), keep=Keep.BOTTOM)


with BuildPart() as f8_tool32:
    # F8_s33 → F8_t34 (new body)
    with BuildSketch(Plane.XY.offset(10.5799383582)):
        with BuildLine():
            ThreePointArc((-8.3195897121, -65.6376098991), (-7.9198441354, -65.5147680663), (-7.7477116138, -65.1336420544))
            Line((-7.7477116138, -65.1336420544), (-7.7477116138, -65.7075670756))
            ThreePointArc((-7.7477116138, -65.7075670756), (-8.0337268111, -65.6732109751), (-8.3195897121, -65.6376098991))
        make_face()
    extrude(amount=-F8_T34_DEPTH)

    split(bisect_by=Plane.XY.offset(5.8094483702), keep=Keep.BOTTOM)


with BuildPart() as f8_tool28_1:
    add(f8_tool28.part)

    # F8_t36: intersect F8_tool32
    add(f8_tool32.part, mode=Mode.INTERSECT)


with BuildPart() as f1_4:
    add(f1_3.part)

    # F8_t26: cut F8_tool28
    add(f8_tool28_1.part, mode=Mode.SUBTRACT)


with BuildPart() as f8_tool39:
    # F8_s40 → F8_t41 (revolve)
    with BuildSketch(Plane(origin=(0, 0, 0), x_dir=(0, 0, 1), z_dir=(0.9906894385, 0.1361412371, 0))):
        with BuildLine():
            ThreePointArc((11.0879383582, 66.1627644998), (10.7287281134, 66.0139747446), (10.5799383582, 65.6547644998))
            Line((10.5799383582, 65.6547644998), (10.5799383582, 66.1627644998))
            Line((10.5799383582, 66.1627644998), (11.0879383582, 66.1627644998))
        make_face()
    revolve(axis=Axis((0, 0, 10.5799383582), (0, 0, -1)), revolution_arc=F8_T41_ANGLE)

    split(bisect_by=Plane.YZ.offset(7.7477116138), keep=Keep.TOP)


with BuildPart() as f8_tool43:
    # F8_s44 → F8_t45 (new body)
    with BuildSketch(Plane.XY.offset(12.0202911055)):
        with BuildLine():
            ThreePointArc((8.3195897121, -65.6376098991), (7.9198441354, -65.5147680663), (7.7477116138, -65.1336420544))
            Line((7.7477116138, -65.1336420544), (7.7477116138, -65.7075670756))
            ThreePointArc((7.7477116138, -65.7075670756), (8.0337268111, -65.6732109751), (8.3195897121, -65.6376098991))
        make_face()
    extrude(amount=-F8_T45_DEPTH)

    split(bisect_by=Plane.XY.offset(10.5799383582), keep=Keep.TOP)


with BuildPart() as f8_tool39_1:
    add(f8_tool39.part)

    # F8_t47: intersect F8_tool43
    add(f8_tool43.part, mode=Mode.INTERSECT)


with BuildPart() as f1_5:
    add(f1_4.part)

    # F8_t37: cut F8_tool39
    add(f8_tool39_1.part, mode=Mode.SUBTRACT)


with BuildPart() as f8_tool50:
    # F8_s51 → F8_t52 (new body)
    with BuildSketch(Plane.XY.offset(10.5799383582)):
        with BuildLine():
            ThreePointArc((8.3195897121, -65.6376098991), (7.9198441354, -65.5147680663), (7.7477116138, -65.1336420544))
            Line((7.7477116138, -65.1336420544), (7.7477116138, -65.7075670756))
            ThreePointArc((7.7477116138, -65.7075670756), (8.0337268111, -65.6732109751), (8.3195897121, -65.6376098991))
        make_face()
    extrude(amount=-F8_T52_DEPTH)

    split(bisect_by=Plane.XY.offset(5.8094483702), keep=Keep.BOTTOM)


with BuildPart() as f8_tool54:
    # F8_s55 → F8_t56 (revolve)
    with BuildSketch(Plane(origin=(0, 0, 0), x_dir=(0, 0, 1), z_dir=(0.9906894385, 0.1361412371, 0))):
        with BuildLine():
            ThreePointArc((5.3014483702, 66.1627644998), (5.660658615, 66.0139747446), (5.8094483702, 65.6547644998))
            Line((5.8094483702, 65.6547644998), (5.8094483702, 66.1627644998))
            Line((5.8094483702, 66.1627644998), (5.3014483702, 66.1627644998))
        make_face()
    revolve(axis=Axis((0, 0, 5.8094483702), (0, 0, -1)), revolution_arc=F8_T56_ANGLE)

    split(bisect_by=Plane.YZ.offset(7.7477116138), keep=Keep.TOP)


with BuildPart() as f8_tool50_1:
    add(f8_tool50.part)

    # F8_t58: intersect F8_tool54
    add(f8_tool54.part, mode=Mode.INTERSECT)


with BuildPart() as f1_6:
    add(f1_5.part)

    # F8_t48: cut F8_tool50
    add(f8_tool50_1.part, mode=Mode.SUBTRACT)

    # F9 (on face) → F10 (join)
    with BuildSketch(Plane.YZ.offset(33.3375)):
        with Locations((45.4432945698, 7.2333235135)):
            Rectangle(F9_W, F9_H)
    extrude(amount=F10_DEPTH)

    # F11 (on Front) → F12 (cut, through all)
    with BuildSketch(Plane.XZ):
        with Locations((-24.1370927542, 8.1946933642)):
            Circle(F11_R)
    extrude(amount=-F12_DEPTH, mode=Mode.SUBTRACT)

    # F13 (on face) → F14 (join)
    with BuildSketch(Plane(origin=(-34.7747671557, 0, 0), x_dir=(0, -1, 0), z_dir=(-1, 0, 0))):
        with Locations((-36.0566489398, 8.1946933642)):
            Rectangle(F13_W, F13_H)
    extrude(amount=F14_DEPTH)

    # F15 (on face) → F16 (cut, through all)
    with BuildSketch(Plane(origin=(0, 0, 0), x_dir=(1, 0, 0), z_dir=(0, 0, -1))):
        with BuildLine():
            Line((-14.1083539546, -53.4263903977), (14.1083539546, -53.4263903977))
            ThreePointArc((14.1083539546, -53.4263903977), (16.3534179848, -52.4964544279), (17.2833539546, -50.2513903977))
            Line((17.2833539546, -50.2513903977), (17.2833539546, -45.6384069204))
            ThreePointArc((17.2833539546, -45.6384069204), (16.3534179848, -43.3933428902), (14.1083539546, -42.4634069204))
            Line((14.1083539546, -42.4634069204), (-14.1083539546, -42.4634069204))
            ThreePointArc((-14.1083539546, -42.4634069204), (-16.3534179848, -43.3933428902), (-17.2833539546, -45.6384069204))
            Line((-17.2833539546, -45.6384069204), (-17.2833539546, -50.2513903977))
            ThreePointArc((-17.2833539546, -50.2513903977), (-16.3534179848, -52.4964544279), (-14.1083539546, -53.4263903977))
        make_face()
    extrude(amount=-F16_DEPTH, mode=Mode.SUBTRACT)

    # F17 (on face) → F18 (cut, through all)
    with BuildSketch(Plane(origin=(0, 0, 0), x_dir=(1, 0, 0), z_dir=(0, 0, -1))):
        with BuildLine():
            Line((-20.30652088, 44.2513413727), (-9.1347757645, 44.2513413727))
            ThreePointArc((-9.1347757645, 44.2513413727), (-6.8897117342, 45.1812773425), (-5.9597757645, 47.4263413727))
            Line((-5.9597757645, 47.4263413727), (-5.9597757645, 49.4200230658))
            ThreePointArc((-5.9597757645, 49.4200230658), (-6.8897117342, 51.6650870961), (-9.1347757645, 52.5950230658))
            Line((-9.1347757645, 52.5950230658), (-20.30652088, 52.5950230658))
            ThreePointArc((-20.30652088, 52.5950230658), (-22.5515849103, 51.6650870961), (-23.48152088, 49.4200230658))
            Line((-23.48152088, 49.4200230658), (-23.48152088, 47.4263413727))
            ThreePointArc((-23.48152088, 47.4263413727), (-22.5515849103, 45.1812773425), (-20.30652088, 44.2513413727))
        make_face()
    extrude(amount=-F18_DEPTH, mode=Mode.SUBTRACT)

    # F19 (on Right) → F20 (cut)
    with BuildSketch(Plane.YZ):
        with Locations((36.0044911504, 8.1135937944)):
            Rectangle(F19_W, F19_H)
    extrude(amount=-F20_DEPTH, mode=Mode.SUBTRACT)

    # F21 (on Right) → F22 (cut)
    with BuildSketch(Plane.YZ):
        with Locations((45.5593243241, 7.3050209321)):
            Rectangle(F21_W, F21_H)
    extrude(amount=F22_DEPTH, mode=Mode.SUBTRACT)


solid = f1_6.part
